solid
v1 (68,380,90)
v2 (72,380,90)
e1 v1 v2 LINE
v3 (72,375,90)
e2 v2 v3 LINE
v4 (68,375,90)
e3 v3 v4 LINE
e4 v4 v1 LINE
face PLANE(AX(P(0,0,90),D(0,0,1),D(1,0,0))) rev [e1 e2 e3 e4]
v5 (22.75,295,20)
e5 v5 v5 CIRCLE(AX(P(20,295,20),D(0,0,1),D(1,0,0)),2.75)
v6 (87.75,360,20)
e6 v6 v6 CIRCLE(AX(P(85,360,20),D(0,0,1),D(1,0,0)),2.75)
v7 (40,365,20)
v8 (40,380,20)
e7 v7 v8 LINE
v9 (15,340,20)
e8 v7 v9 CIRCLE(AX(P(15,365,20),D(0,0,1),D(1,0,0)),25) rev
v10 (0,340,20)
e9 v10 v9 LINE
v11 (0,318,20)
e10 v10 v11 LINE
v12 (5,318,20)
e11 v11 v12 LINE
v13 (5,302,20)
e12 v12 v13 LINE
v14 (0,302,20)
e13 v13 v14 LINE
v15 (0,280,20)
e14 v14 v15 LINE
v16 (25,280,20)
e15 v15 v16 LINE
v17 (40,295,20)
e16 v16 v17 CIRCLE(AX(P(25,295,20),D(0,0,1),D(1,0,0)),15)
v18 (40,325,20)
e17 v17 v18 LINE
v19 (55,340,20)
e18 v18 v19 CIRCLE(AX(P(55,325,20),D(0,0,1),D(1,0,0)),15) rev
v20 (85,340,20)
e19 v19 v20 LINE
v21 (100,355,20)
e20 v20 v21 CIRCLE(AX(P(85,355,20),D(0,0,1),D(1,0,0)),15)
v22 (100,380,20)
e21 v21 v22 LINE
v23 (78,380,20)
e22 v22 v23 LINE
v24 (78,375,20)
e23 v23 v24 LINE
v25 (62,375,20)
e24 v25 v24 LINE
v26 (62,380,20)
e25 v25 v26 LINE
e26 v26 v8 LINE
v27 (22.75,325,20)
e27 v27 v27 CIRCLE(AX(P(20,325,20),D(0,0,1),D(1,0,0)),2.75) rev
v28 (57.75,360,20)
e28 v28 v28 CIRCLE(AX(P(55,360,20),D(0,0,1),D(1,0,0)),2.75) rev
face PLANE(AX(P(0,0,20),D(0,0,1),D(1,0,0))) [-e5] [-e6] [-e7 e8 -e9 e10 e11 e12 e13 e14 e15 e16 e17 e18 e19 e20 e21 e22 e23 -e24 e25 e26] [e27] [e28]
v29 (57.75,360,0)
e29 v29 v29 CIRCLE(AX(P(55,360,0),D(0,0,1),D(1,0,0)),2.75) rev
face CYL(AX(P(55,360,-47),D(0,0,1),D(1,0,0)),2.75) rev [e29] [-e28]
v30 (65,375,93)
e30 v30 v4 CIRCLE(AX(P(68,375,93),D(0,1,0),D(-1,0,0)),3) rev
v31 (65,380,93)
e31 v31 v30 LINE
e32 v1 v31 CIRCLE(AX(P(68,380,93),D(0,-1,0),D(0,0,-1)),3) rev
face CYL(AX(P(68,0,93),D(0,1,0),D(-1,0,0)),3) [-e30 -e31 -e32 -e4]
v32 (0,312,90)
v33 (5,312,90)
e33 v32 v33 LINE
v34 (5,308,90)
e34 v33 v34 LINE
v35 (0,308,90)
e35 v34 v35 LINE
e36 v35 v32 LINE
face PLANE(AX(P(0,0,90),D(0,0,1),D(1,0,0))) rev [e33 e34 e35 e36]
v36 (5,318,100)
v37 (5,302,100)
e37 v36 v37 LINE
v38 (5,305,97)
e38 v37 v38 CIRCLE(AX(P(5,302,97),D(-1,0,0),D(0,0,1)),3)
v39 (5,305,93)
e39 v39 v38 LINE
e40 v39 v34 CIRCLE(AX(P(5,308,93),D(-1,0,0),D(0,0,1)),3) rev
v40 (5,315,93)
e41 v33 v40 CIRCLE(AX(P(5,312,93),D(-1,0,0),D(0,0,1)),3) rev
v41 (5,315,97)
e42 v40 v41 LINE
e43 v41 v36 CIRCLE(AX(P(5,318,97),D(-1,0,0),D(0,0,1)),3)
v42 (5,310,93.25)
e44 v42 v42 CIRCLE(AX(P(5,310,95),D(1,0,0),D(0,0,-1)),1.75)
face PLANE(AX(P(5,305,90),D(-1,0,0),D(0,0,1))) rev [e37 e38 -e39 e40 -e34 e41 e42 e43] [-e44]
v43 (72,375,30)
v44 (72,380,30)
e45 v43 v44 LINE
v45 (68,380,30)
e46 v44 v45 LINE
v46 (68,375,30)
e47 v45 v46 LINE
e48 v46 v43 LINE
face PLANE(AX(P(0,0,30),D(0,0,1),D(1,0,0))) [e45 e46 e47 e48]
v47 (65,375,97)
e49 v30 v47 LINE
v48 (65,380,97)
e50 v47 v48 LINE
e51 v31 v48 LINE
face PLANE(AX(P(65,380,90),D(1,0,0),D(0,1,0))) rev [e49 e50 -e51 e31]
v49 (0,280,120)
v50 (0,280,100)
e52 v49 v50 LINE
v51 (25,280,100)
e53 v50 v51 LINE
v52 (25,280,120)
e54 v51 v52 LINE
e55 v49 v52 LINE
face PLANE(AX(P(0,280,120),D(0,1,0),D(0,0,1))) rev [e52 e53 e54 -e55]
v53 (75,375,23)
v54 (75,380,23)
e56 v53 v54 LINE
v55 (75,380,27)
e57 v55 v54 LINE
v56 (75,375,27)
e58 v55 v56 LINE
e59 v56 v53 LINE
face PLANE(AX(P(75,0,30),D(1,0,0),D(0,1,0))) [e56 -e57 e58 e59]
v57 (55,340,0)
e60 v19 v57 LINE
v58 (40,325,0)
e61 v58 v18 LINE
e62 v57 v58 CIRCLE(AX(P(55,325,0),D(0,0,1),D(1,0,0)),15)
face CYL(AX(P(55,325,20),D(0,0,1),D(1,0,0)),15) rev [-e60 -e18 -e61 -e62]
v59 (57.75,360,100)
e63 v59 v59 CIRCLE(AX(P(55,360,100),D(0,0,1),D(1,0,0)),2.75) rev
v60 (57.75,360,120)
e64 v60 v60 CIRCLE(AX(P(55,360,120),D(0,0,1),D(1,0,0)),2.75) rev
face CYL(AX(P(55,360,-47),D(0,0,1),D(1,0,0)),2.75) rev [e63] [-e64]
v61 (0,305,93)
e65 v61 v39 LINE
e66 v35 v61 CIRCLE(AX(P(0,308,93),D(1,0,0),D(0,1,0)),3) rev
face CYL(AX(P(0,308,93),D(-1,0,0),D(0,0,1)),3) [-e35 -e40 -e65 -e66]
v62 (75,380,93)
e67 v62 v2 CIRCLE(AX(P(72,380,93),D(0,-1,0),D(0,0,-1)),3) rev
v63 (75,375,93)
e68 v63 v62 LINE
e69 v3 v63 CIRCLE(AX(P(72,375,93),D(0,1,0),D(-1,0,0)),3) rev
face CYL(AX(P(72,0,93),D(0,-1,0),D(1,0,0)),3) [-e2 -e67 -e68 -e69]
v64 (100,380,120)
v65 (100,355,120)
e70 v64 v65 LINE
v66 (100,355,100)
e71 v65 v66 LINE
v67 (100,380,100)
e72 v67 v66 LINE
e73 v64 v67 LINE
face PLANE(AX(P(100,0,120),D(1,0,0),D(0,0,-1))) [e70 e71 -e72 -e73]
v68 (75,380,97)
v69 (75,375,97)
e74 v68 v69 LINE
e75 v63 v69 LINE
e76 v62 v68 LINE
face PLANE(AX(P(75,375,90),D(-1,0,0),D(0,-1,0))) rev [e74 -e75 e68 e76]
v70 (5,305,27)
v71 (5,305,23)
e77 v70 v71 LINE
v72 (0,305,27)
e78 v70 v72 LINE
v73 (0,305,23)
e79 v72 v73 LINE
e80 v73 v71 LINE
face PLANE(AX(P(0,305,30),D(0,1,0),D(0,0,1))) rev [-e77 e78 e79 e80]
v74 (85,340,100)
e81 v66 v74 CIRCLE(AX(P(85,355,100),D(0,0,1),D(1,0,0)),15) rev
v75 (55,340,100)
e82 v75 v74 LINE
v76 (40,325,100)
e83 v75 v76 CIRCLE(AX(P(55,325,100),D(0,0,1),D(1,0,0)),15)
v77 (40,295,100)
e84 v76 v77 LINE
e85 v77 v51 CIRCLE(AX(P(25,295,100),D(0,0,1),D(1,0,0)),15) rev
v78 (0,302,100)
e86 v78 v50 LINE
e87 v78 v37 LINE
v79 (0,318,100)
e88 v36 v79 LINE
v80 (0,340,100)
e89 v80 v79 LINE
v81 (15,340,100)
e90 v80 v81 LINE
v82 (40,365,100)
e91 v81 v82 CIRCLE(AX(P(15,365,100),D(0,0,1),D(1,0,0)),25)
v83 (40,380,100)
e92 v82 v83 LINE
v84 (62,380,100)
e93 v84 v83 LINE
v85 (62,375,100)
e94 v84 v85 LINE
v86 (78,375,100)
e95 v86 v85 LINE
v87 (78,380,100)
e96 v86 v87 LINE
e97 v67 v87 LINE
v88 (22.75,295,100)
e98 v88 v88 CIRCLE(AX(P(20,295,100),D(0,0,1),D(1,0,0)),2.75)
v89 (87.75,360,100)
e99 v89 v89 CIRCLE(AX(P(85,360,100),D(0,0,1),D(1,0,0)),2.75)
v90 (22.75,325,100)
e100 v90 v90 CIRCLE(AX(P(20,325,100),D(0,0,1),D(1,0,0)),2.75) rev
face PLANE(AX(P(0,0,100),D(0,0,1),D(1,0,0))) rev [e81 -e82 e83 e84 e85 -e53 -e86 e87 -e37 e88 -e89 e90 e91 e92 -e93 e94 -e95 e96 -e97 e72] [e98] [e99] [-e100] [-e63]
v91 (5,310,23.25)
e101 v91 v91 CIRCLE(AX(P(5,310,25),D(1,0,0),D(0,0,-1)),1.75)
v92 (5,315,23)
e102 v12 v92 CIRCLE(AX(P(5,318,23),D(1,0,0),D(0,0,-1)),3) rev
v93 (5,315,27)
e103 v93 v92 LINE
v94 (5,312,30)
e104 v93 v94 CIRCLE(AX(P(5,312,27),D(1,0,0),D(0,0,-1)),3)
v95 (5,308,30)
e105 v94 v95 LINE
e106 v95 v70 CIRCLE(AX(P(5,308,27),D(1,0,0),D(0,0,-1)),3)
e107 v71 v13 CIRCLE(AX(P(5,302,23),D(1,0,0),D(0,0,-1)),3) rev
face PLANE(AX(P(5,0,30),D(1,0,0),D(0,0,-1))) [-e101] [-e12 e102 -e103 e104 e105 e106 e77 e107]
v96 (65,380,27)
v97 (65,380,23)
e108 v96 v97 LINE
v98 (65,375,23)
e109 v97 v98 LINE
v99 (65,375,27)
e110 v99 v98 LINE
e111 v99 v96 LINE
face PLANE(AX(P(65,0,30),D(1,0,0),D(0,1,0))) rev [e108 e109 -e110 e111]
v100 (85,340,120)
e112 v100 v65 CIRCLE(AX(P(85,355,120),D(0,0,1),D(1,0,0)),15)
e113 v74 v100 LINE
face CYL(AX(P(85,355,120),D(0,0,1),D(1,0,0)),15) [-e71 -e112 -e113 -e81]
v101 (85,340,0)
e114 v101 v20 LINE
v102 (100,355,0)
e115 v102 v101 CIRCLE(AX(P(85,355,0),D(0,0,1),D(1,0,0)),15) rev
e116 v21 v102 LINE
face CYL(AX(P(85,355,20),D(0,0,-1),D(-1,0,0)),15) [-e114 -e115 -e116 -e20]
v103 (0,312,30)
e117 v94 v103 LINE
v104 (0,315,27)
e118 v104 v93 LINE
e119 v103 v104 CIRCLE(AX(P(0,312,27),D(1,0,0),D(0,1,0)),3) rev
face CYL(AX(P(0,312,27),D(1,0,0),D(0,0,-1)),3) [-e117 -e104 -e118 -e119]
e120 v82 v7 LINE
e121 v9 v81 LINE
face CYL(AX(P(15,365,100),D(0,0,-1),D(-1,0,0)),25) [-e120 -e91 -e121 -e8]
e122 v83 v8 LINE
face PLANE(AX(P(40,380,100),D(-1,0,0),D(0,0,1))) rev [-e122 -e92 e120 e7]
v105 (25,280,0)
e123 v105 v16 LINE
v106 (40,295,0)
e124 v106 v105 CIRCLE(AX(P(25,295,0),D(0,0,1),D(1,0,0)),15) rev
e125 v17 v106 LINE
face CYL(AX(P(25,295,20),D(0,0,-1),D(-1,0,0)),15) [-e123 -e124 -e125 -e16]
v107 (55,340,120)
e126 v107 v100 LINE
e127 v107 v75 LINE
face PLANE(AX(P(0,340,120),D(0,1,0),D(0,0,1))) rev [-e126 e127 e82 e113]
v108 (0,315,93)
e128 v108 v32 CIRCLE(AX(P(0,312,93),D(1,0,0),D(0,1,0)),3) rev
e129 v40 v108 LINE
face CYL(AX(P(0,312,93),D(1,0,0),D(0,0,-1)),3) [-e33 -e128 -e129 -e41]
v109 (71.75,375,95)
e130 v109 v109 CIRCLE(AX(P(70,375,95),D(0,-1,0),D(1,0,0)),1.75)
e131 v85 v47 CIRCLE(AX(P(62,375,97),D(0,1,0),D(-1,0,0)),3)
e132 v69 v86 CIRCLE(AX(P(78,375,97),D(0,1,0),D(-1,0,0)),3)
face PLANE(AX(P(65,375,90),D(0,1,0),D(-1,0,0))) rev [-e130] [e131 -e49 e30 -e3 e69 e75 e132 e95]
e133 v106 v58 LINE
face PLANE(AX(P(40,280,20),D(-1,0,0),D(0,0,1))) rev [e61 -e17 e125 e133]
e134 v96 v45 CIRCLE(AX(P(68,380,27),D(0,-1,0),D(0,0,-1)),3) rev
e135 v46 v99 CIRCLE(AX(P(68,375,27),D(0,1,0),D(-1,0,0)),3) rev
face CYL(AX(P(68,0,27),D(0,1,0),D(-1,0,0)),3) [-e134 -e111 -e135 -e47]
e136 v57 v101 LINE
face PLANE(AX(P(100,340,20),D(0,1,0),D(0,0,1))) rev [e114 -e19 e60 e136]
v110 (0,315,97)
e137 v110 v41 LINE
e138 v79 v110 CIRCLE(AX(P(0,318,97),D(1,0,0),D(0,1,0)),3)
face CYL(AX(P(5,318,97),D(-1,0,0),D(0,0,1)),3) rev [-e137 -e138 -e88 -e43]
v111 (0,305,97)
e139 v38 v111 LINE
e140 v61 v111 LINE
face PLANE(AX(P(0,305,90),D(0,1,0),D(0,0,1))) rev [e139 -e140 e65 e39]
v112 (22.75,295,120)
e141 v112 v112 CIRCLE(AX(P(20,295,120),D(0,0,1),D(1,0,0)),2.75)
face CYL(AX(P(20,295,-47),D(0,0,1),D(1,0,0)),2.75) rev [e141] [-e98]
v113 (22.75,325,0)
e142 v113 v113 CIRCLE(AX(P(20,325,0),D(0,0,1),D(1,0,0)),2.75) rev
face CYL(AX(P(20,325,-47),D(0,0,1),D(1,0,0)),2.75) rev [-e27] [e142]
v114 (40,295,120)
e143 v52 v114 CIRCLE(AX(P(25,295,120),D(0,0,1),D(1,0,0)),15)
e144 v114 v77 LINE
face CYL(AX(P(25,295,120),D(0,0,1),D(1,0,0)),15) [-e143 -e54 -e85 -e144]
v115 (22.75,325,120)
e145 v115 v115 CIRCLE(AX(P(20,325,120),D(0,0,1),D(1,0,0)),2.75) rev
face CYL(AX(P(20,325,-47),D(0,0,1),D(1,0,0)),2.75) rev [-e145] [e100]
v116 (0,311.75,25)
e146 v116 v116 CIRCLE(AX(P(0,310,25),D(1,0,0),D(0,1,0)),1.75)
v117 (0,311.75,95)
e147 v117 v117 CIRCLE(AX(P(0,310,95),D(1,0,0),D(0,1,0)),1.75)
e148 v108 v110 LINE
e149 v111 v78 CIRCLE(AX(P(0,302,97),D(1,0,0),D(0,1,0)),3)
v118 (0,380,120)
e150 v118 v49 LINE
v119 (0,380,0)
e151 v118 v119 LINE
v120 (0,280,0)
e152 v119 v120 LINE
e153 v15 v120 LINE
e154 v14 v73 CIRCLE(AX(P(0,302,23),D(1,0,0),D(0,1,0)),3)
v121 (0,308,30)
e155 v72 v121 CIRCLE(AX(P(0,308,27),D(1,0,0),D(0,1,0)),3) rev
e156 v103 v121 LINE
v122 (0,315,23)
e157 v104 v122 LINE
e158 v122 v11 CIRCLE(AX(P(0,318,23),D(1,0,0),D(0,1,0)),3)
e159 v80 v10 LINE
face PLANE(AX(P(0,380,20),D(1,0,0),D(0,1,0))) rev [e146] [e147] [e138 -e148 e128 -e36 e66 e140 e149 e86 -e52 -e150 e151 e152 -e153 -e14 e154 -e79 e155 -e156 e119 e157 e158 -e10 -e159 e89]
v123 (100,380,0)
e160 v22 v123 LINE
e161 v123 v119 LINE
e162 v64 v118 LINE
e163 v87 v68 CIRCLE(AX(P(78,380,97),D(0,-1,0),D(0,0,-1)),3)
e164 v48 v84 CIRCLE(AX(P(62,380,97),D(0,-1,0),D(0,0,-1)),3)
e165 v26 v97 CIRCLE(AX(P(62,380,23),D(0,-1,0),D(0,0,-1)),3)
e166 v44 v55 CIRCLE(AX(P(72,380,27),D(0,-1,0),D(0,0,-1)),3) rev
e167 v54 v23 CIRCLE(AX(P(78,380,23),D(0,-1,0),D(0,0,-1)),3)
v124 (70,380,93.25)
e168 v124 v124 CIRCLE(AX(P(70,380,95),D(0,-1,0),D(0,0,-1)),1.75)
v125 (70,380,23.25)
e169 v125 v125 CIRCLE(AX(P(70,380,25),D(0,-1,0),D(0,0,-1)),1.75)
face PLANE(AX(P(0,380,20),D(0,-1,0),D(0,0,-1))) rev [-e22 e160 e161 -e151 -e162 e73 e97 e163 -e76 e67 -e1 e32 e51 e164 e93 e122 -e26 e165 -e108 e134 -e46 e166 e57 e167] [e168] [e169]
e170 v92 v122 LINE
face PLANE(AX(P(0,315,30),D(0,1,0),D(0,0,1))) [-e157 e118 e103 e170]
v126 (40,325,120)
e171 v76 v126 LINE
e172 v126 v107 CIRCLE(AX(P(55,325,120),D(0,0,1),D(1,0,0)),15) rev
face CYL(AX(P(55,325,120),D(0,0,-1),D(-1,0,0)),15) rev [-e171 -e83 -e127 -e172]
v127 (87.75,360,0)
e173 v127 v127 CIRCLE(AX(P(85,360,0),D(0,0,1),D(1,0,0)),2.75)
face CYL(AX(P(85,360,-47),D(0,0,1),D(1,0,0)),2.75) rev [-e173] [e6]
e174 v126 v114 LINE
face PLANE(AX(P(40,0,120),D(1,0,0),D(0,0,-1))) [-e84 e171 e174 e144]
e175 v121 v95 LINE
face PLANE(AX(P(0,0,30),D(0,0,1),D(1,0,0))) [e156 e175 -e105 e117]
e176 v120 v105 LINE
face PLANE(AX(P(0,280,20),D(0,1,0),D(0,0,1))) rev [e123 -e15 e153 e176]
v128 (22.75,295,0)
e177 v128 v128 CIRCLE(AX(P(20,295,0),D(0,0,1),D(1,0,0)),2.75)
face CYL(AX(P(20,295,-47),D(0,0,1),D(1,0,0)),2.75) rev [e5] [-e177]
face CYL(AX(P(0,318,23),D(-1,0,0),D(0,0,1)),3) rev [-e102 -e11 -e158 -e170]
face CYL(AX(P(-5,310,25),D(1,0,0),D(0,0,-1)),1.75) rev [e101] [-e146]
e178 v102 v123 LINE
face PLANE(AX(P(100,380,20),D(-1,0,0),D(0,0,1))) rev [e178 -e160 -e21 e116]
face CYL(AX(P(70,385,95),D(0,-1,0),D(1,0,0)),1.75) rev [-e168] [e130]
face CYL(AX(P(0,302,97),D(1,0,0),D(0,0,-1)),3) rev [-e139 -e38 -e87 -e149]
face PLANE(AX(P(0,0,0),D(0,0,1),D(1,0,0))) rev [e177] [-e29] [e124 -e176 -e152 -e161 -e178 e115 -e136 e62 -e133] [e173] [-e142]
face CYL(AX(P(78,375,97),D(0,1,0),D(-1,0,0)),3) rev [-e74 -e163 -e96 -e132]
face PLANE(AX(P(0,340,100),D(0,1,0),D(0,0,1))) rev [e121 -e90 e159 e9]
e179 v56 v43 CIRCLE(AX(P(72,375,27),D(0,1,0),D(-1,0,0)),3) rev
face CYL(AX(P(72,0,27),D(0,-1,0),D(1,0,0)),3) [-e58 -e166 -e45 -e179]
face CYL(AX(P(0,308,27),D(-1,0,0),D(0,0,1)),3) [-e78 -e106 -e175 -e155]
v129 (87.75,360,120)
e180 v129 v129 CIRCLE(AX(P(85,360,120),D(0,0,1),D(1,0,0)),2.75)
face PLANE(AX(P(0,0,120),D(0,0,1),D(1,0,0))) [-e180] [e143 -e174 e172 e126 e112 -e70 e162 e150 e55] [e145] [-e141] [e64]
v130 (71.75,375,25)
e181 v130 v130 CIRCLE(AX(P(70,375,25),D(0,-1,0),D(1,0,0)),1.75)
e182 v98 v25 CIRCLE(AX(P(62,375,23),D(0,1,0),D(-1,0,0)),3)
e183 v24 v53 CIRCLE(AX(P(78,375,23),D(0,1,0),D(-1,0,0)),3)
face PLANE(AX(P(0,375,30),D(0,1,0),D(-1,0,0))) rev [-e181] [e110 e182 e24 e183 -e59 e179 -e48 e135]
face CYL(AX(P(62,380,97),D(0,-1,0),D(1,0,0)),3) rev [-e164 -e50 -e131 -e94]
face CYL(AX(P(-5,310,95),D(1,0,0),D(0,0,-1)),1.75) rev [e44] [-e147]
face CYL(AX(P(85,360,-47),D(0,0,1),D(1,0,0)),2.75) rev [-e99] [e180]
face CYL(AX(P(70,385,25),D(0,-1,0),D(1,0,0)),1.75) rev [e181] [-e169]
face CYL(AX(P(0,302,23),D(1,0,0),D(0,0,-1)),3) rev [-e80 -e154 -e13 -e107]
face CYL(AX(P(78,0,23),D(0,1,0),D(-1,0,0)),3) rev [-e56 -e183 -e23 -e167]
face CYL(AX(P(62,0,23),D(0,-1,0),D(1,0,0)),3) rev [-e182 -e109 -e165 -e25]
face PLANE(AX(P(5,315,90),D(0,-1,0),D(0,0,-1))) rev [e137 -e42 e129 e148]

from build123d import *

# Parameters (mm, degrees)
BOSS_EXTRUDE1_DEPTH = 20
SKETCH2_W           = 40
SKETCH2_H           = 40
BOSS_EXTRUDE2_DEPTH = 80
SKETCH3_W           = 40
SKETCH3_H           = 60
SKETCH3_H_2         = 40
SKETCH3_W_2         = 60
BOSS_EXTRUDE3_DEPTH = 20
SKETCH5_R           = 2.75
CUT_EXTRUDE1_DEPTH  = 167
FILLET1_R           = 25
FILLET2_R           = 15
SKETCH6_W           = 5
SKETCH6_H           = 10
SKETCH6_W_2         = 10
SKETCH6_H_2         = 5
BOSS_EXTRUDE4_DEPTH = 10
CUT_EXTRUDE2_DEPTH  = 10
CUT_EXTRUDE3_DEPTH  = 10
SKETCH9_W           = 10
SKETCH9_H           = 5
SKETCH9_W_2         = 5
SKETCH9_H_2         = 10
BOSS_EXTRUDE5_DEPTH = 10
CUT_EXTRUDE4_DEPTH  = 10
CUT_EXTRUDE5_DEPTH  = 10
FILLET4_R           = 3


with BuildPart() as part:
    # Sketch1 → Boss-Extrude1 (new body)
    with BuildSketch(Plane.XY):
        Polygon((100, 380), (100, 340), (40, 340), (40, 280), (0, 280), (0, 380), align=None)
    extrude(amount=BOSS_EXTRUDE1_DEPTH)

    # Sketch2 → Boss-Extrude2 (add)
    with BuildSketch(Plane.XY.offset(20)):
        with Locations((20, 360)):
            Rectangle(SKETCH2_W, SKETCH2_H)
    extrude(amount=BOSS_EXTRUDE2_DEPTH)

    # Sketch3 → Boss-Extrude3 (add)
    with BuildSketch(Plane.XY.offset(100)):
        with Locations((20, 310)):
            Rectangle(SKETCH3_W, SKETCH3_H)
        with Locations((20, 360)):
            Rectangle(SKETCH3_W, SKETCH3_H_2)
        with Locations((70, 360)):
            Rectangle(SKETCH3_W_2, SKETCH3_H_2)
    extrude(amount=BOSS_EXTRUDE3_DEPTH)

    # Sketch5 → Cut-Extrude1 (cut)
    with BuildSketch(Plane.XY.offset(120)):
        with Locations((55, 360)):
            Circle(SKETCH5_R)
        with BuildLine():
            ThreePointArc((82.25, 360), (85, 357.25), (87.75, 360))
            Line((87.75, 360), (82.25, 360))
        make_face()
        with BuildLine():
            Line((82.25, 360), (87.75, 360))
            ThreePointArc((87.75, 360), (85, 362.75), (82.25, 360))
        make_face()
        with Locations((20, 325)):
            Circle(SKETCH5_R)
        with BuildLine():
            ThreePointArc((22.75, 295), (21.944543648, 296.944543648), (20, 297.75))
            Line((20, 297.75), (20, 292.25))
            ThreePointArc((20, 292.25), (21.944543648, 293.055456352), (22.75, 295))
        make_face()
        with BuildLine():
            Line((20, 292.25), (20, 297.75))
            ThreePointArc((20, 297.75), (17.25, 295), (20, 292.25))
        make_face()
    extrude(amount=-CUT_EXTRUDE1_DEPTH, mode=Mode.SUBTRACT)

    # Fillet1
    # the kernel refuses this fillet: 25 mm, written as the material it takes off along each edge
    with BuildSketch(Plane(origin=(40, 340, 20), x_dir=(0, 1, 0), z_dir=(0, 0, 1))) as fillet1_piece_1:
        with BuildLine():
            CenterArc((FILLET1_R, FILLET1_R), FILLET1_R, 180, 90)
            Line((0, FILLET1_R), (0, 0))
            Line((0, 0), (FILLET1_R, 0))
        make_face()
    extrude(amount=80, mode=Mode.SUBTRACT)

    # Fillet2
    fillet2_edges = [part.edges().sort_by_distance(p)[0] for p in [
        (100, 340, 10),
        (40, 340, 10),
        (40, 280, 10),
        (40, 280, 110),
        (40, 340, 110),
        (100, 340, 110),
    ]]
    fillet(fillet2_edges, radius=FILLET2_R)

    # Sketch6 → Boss-Extrude4 (add)
    with BuildSketch(Plane.XY.offset(20)):
        with Locations((2.5, 310)):
            Rectangle(SKETCH6_W, SKETCH6_H)
        with Locations((70, 377.5)):
            Rectangle(SKETCH6_W_2, SKETCH6_H_2)
    extrude(amount=BOSS_EXTRUDE4_DEPTH)

    # Sketch7 → Cut-Extrude2 (cut)
    with BuildSketch(Plane.XZ.offset(-375)):
        with BuildLine():
            ThreePointArc((71.75, 25), (71.237436867, 26.237436867), (70, 26.75))
            Line((70, 26.75), (70, 23.25))
            ThreePointArc((70, 23.25), (71.237436867, 23.762563133), (71.75, 25))
        make_face()
        with BuildLine():
            Line((70, 23.25), (70, 26.75))
            ThreePointArc((70, 26.75), (68.25, 25), (70, 23.25))
        make_face()
    extrude(amount=-CUT_EXTRUDE2_DEPTH, mode=Mode.SUBTRACT)

    # Sketch8 → Cut-Extrude3 (cut)
    with BuildSketch(Plane(origin=(5, 0, 0), x_dir=(0, 0, -1), z_dir=(1, 0, 0))):
        with BuildLine():
            ThreePointArc((-23.25, 310), (-25, 311.75), (-26.75, 310))
            Line((-26.75, 310), (-23.25, 310))
        make_face()
        with BuildLine():
            Line((-23.25, 310), (-26.75, 310))
            ThreePointArc((-26.75, 310), (-25, 308.25), (-23.25, 310))
        make_face()
    extrude(amount=-CUT_EXTRUDE3_DEPTH, mode=Mode.SUBTRACT)

    # Sketch9 → Boss-Extrude5 (add)
    with BuildSketch(Plane(origin=(0, 0, 100), x_dir=(-1, 0, 0), z_dir=(0, 0, -1))):
        with Locations((-70, 377.5)):
            Rectangle(SKETCH9_W, SKETCH9_H)
        with Locations((-2.5, 310)):
            Rectangle(SKETCH9_W_2, SKETCH9_H_2)
    extrude(amount=BOSS_EXTRUDE5_DEPTH)

    # Sketch10 → Cut-Extrude4 (cut)
    with BuildSketch(Plane(origin=(5, 0, 0), x_dir=(0, 0, -1), z_dir=(1, 0, 0))):
        with BuildLine():
            ThreePointArc((-96.75, 310), (-95, 308.25), (-93.25, 310))
            Line((-93.25, 310), (-96.75, 310))
        make_face()
        with BuildLine():
            Line((-96.75, 310), (-93.25, 310))
            ThreePointArc((-93.25, 310), (-95, 311.75), (-96.75, 310))
        make_face()
    extrude(amount=-CUT_EXTRUDE4_DEPTH, mode=Mode.SUBTRACT)

    # Sketch11 → Cut-Extrude5 (cut)
    with BuildSketch(Plane.XZ.offset(-375)):
        with BuildLine():
            ThreePointArc((71.75, 95), (71.237436867, 96.237436867), (70, 96.75))
            Line((70, 96.75), (70, 93.25))
            ThreePointArc((70, 93.25), (71.237436867, 93.762563133), (71.75, 95))
        make_face()
        with BuildLine():
            Line((70, 93.25), (70, 96.75))
            ThreePointArc((70, 96.75), (68.25, 95), (70, 93.25))
        make_face()
    extrude(amount=-CUT_EXTRUDE5_DEPTH, mode=Mode.SUBTRACT)

    # Fillet4
    fillet4_edges = [part.edges().sort_by_distance(p)[0] for p in [
        (2.5, 315, 30),
        (2.5, 305, 20),
        (2.5, 305, 30),
        (2.5, 315, 20),
        (75, 377.5, 30),
        (65, 377.5, 20),
        (65, 377.5, 30),
        (75, 377.5, 20),
        (65, 377.5, 100),
        (75, 377.5, 100),
        (65, 377.5, 90),
        (75, 377.5, 90),
        (2.5, 305, 100),
        (2.5, 315, 100),
        (2.5, 305, 90),
        (2.5, 315, 90),
    ]]
    fillet(fillet4_edges, radius=FILLET4_R)


solid = part.part
